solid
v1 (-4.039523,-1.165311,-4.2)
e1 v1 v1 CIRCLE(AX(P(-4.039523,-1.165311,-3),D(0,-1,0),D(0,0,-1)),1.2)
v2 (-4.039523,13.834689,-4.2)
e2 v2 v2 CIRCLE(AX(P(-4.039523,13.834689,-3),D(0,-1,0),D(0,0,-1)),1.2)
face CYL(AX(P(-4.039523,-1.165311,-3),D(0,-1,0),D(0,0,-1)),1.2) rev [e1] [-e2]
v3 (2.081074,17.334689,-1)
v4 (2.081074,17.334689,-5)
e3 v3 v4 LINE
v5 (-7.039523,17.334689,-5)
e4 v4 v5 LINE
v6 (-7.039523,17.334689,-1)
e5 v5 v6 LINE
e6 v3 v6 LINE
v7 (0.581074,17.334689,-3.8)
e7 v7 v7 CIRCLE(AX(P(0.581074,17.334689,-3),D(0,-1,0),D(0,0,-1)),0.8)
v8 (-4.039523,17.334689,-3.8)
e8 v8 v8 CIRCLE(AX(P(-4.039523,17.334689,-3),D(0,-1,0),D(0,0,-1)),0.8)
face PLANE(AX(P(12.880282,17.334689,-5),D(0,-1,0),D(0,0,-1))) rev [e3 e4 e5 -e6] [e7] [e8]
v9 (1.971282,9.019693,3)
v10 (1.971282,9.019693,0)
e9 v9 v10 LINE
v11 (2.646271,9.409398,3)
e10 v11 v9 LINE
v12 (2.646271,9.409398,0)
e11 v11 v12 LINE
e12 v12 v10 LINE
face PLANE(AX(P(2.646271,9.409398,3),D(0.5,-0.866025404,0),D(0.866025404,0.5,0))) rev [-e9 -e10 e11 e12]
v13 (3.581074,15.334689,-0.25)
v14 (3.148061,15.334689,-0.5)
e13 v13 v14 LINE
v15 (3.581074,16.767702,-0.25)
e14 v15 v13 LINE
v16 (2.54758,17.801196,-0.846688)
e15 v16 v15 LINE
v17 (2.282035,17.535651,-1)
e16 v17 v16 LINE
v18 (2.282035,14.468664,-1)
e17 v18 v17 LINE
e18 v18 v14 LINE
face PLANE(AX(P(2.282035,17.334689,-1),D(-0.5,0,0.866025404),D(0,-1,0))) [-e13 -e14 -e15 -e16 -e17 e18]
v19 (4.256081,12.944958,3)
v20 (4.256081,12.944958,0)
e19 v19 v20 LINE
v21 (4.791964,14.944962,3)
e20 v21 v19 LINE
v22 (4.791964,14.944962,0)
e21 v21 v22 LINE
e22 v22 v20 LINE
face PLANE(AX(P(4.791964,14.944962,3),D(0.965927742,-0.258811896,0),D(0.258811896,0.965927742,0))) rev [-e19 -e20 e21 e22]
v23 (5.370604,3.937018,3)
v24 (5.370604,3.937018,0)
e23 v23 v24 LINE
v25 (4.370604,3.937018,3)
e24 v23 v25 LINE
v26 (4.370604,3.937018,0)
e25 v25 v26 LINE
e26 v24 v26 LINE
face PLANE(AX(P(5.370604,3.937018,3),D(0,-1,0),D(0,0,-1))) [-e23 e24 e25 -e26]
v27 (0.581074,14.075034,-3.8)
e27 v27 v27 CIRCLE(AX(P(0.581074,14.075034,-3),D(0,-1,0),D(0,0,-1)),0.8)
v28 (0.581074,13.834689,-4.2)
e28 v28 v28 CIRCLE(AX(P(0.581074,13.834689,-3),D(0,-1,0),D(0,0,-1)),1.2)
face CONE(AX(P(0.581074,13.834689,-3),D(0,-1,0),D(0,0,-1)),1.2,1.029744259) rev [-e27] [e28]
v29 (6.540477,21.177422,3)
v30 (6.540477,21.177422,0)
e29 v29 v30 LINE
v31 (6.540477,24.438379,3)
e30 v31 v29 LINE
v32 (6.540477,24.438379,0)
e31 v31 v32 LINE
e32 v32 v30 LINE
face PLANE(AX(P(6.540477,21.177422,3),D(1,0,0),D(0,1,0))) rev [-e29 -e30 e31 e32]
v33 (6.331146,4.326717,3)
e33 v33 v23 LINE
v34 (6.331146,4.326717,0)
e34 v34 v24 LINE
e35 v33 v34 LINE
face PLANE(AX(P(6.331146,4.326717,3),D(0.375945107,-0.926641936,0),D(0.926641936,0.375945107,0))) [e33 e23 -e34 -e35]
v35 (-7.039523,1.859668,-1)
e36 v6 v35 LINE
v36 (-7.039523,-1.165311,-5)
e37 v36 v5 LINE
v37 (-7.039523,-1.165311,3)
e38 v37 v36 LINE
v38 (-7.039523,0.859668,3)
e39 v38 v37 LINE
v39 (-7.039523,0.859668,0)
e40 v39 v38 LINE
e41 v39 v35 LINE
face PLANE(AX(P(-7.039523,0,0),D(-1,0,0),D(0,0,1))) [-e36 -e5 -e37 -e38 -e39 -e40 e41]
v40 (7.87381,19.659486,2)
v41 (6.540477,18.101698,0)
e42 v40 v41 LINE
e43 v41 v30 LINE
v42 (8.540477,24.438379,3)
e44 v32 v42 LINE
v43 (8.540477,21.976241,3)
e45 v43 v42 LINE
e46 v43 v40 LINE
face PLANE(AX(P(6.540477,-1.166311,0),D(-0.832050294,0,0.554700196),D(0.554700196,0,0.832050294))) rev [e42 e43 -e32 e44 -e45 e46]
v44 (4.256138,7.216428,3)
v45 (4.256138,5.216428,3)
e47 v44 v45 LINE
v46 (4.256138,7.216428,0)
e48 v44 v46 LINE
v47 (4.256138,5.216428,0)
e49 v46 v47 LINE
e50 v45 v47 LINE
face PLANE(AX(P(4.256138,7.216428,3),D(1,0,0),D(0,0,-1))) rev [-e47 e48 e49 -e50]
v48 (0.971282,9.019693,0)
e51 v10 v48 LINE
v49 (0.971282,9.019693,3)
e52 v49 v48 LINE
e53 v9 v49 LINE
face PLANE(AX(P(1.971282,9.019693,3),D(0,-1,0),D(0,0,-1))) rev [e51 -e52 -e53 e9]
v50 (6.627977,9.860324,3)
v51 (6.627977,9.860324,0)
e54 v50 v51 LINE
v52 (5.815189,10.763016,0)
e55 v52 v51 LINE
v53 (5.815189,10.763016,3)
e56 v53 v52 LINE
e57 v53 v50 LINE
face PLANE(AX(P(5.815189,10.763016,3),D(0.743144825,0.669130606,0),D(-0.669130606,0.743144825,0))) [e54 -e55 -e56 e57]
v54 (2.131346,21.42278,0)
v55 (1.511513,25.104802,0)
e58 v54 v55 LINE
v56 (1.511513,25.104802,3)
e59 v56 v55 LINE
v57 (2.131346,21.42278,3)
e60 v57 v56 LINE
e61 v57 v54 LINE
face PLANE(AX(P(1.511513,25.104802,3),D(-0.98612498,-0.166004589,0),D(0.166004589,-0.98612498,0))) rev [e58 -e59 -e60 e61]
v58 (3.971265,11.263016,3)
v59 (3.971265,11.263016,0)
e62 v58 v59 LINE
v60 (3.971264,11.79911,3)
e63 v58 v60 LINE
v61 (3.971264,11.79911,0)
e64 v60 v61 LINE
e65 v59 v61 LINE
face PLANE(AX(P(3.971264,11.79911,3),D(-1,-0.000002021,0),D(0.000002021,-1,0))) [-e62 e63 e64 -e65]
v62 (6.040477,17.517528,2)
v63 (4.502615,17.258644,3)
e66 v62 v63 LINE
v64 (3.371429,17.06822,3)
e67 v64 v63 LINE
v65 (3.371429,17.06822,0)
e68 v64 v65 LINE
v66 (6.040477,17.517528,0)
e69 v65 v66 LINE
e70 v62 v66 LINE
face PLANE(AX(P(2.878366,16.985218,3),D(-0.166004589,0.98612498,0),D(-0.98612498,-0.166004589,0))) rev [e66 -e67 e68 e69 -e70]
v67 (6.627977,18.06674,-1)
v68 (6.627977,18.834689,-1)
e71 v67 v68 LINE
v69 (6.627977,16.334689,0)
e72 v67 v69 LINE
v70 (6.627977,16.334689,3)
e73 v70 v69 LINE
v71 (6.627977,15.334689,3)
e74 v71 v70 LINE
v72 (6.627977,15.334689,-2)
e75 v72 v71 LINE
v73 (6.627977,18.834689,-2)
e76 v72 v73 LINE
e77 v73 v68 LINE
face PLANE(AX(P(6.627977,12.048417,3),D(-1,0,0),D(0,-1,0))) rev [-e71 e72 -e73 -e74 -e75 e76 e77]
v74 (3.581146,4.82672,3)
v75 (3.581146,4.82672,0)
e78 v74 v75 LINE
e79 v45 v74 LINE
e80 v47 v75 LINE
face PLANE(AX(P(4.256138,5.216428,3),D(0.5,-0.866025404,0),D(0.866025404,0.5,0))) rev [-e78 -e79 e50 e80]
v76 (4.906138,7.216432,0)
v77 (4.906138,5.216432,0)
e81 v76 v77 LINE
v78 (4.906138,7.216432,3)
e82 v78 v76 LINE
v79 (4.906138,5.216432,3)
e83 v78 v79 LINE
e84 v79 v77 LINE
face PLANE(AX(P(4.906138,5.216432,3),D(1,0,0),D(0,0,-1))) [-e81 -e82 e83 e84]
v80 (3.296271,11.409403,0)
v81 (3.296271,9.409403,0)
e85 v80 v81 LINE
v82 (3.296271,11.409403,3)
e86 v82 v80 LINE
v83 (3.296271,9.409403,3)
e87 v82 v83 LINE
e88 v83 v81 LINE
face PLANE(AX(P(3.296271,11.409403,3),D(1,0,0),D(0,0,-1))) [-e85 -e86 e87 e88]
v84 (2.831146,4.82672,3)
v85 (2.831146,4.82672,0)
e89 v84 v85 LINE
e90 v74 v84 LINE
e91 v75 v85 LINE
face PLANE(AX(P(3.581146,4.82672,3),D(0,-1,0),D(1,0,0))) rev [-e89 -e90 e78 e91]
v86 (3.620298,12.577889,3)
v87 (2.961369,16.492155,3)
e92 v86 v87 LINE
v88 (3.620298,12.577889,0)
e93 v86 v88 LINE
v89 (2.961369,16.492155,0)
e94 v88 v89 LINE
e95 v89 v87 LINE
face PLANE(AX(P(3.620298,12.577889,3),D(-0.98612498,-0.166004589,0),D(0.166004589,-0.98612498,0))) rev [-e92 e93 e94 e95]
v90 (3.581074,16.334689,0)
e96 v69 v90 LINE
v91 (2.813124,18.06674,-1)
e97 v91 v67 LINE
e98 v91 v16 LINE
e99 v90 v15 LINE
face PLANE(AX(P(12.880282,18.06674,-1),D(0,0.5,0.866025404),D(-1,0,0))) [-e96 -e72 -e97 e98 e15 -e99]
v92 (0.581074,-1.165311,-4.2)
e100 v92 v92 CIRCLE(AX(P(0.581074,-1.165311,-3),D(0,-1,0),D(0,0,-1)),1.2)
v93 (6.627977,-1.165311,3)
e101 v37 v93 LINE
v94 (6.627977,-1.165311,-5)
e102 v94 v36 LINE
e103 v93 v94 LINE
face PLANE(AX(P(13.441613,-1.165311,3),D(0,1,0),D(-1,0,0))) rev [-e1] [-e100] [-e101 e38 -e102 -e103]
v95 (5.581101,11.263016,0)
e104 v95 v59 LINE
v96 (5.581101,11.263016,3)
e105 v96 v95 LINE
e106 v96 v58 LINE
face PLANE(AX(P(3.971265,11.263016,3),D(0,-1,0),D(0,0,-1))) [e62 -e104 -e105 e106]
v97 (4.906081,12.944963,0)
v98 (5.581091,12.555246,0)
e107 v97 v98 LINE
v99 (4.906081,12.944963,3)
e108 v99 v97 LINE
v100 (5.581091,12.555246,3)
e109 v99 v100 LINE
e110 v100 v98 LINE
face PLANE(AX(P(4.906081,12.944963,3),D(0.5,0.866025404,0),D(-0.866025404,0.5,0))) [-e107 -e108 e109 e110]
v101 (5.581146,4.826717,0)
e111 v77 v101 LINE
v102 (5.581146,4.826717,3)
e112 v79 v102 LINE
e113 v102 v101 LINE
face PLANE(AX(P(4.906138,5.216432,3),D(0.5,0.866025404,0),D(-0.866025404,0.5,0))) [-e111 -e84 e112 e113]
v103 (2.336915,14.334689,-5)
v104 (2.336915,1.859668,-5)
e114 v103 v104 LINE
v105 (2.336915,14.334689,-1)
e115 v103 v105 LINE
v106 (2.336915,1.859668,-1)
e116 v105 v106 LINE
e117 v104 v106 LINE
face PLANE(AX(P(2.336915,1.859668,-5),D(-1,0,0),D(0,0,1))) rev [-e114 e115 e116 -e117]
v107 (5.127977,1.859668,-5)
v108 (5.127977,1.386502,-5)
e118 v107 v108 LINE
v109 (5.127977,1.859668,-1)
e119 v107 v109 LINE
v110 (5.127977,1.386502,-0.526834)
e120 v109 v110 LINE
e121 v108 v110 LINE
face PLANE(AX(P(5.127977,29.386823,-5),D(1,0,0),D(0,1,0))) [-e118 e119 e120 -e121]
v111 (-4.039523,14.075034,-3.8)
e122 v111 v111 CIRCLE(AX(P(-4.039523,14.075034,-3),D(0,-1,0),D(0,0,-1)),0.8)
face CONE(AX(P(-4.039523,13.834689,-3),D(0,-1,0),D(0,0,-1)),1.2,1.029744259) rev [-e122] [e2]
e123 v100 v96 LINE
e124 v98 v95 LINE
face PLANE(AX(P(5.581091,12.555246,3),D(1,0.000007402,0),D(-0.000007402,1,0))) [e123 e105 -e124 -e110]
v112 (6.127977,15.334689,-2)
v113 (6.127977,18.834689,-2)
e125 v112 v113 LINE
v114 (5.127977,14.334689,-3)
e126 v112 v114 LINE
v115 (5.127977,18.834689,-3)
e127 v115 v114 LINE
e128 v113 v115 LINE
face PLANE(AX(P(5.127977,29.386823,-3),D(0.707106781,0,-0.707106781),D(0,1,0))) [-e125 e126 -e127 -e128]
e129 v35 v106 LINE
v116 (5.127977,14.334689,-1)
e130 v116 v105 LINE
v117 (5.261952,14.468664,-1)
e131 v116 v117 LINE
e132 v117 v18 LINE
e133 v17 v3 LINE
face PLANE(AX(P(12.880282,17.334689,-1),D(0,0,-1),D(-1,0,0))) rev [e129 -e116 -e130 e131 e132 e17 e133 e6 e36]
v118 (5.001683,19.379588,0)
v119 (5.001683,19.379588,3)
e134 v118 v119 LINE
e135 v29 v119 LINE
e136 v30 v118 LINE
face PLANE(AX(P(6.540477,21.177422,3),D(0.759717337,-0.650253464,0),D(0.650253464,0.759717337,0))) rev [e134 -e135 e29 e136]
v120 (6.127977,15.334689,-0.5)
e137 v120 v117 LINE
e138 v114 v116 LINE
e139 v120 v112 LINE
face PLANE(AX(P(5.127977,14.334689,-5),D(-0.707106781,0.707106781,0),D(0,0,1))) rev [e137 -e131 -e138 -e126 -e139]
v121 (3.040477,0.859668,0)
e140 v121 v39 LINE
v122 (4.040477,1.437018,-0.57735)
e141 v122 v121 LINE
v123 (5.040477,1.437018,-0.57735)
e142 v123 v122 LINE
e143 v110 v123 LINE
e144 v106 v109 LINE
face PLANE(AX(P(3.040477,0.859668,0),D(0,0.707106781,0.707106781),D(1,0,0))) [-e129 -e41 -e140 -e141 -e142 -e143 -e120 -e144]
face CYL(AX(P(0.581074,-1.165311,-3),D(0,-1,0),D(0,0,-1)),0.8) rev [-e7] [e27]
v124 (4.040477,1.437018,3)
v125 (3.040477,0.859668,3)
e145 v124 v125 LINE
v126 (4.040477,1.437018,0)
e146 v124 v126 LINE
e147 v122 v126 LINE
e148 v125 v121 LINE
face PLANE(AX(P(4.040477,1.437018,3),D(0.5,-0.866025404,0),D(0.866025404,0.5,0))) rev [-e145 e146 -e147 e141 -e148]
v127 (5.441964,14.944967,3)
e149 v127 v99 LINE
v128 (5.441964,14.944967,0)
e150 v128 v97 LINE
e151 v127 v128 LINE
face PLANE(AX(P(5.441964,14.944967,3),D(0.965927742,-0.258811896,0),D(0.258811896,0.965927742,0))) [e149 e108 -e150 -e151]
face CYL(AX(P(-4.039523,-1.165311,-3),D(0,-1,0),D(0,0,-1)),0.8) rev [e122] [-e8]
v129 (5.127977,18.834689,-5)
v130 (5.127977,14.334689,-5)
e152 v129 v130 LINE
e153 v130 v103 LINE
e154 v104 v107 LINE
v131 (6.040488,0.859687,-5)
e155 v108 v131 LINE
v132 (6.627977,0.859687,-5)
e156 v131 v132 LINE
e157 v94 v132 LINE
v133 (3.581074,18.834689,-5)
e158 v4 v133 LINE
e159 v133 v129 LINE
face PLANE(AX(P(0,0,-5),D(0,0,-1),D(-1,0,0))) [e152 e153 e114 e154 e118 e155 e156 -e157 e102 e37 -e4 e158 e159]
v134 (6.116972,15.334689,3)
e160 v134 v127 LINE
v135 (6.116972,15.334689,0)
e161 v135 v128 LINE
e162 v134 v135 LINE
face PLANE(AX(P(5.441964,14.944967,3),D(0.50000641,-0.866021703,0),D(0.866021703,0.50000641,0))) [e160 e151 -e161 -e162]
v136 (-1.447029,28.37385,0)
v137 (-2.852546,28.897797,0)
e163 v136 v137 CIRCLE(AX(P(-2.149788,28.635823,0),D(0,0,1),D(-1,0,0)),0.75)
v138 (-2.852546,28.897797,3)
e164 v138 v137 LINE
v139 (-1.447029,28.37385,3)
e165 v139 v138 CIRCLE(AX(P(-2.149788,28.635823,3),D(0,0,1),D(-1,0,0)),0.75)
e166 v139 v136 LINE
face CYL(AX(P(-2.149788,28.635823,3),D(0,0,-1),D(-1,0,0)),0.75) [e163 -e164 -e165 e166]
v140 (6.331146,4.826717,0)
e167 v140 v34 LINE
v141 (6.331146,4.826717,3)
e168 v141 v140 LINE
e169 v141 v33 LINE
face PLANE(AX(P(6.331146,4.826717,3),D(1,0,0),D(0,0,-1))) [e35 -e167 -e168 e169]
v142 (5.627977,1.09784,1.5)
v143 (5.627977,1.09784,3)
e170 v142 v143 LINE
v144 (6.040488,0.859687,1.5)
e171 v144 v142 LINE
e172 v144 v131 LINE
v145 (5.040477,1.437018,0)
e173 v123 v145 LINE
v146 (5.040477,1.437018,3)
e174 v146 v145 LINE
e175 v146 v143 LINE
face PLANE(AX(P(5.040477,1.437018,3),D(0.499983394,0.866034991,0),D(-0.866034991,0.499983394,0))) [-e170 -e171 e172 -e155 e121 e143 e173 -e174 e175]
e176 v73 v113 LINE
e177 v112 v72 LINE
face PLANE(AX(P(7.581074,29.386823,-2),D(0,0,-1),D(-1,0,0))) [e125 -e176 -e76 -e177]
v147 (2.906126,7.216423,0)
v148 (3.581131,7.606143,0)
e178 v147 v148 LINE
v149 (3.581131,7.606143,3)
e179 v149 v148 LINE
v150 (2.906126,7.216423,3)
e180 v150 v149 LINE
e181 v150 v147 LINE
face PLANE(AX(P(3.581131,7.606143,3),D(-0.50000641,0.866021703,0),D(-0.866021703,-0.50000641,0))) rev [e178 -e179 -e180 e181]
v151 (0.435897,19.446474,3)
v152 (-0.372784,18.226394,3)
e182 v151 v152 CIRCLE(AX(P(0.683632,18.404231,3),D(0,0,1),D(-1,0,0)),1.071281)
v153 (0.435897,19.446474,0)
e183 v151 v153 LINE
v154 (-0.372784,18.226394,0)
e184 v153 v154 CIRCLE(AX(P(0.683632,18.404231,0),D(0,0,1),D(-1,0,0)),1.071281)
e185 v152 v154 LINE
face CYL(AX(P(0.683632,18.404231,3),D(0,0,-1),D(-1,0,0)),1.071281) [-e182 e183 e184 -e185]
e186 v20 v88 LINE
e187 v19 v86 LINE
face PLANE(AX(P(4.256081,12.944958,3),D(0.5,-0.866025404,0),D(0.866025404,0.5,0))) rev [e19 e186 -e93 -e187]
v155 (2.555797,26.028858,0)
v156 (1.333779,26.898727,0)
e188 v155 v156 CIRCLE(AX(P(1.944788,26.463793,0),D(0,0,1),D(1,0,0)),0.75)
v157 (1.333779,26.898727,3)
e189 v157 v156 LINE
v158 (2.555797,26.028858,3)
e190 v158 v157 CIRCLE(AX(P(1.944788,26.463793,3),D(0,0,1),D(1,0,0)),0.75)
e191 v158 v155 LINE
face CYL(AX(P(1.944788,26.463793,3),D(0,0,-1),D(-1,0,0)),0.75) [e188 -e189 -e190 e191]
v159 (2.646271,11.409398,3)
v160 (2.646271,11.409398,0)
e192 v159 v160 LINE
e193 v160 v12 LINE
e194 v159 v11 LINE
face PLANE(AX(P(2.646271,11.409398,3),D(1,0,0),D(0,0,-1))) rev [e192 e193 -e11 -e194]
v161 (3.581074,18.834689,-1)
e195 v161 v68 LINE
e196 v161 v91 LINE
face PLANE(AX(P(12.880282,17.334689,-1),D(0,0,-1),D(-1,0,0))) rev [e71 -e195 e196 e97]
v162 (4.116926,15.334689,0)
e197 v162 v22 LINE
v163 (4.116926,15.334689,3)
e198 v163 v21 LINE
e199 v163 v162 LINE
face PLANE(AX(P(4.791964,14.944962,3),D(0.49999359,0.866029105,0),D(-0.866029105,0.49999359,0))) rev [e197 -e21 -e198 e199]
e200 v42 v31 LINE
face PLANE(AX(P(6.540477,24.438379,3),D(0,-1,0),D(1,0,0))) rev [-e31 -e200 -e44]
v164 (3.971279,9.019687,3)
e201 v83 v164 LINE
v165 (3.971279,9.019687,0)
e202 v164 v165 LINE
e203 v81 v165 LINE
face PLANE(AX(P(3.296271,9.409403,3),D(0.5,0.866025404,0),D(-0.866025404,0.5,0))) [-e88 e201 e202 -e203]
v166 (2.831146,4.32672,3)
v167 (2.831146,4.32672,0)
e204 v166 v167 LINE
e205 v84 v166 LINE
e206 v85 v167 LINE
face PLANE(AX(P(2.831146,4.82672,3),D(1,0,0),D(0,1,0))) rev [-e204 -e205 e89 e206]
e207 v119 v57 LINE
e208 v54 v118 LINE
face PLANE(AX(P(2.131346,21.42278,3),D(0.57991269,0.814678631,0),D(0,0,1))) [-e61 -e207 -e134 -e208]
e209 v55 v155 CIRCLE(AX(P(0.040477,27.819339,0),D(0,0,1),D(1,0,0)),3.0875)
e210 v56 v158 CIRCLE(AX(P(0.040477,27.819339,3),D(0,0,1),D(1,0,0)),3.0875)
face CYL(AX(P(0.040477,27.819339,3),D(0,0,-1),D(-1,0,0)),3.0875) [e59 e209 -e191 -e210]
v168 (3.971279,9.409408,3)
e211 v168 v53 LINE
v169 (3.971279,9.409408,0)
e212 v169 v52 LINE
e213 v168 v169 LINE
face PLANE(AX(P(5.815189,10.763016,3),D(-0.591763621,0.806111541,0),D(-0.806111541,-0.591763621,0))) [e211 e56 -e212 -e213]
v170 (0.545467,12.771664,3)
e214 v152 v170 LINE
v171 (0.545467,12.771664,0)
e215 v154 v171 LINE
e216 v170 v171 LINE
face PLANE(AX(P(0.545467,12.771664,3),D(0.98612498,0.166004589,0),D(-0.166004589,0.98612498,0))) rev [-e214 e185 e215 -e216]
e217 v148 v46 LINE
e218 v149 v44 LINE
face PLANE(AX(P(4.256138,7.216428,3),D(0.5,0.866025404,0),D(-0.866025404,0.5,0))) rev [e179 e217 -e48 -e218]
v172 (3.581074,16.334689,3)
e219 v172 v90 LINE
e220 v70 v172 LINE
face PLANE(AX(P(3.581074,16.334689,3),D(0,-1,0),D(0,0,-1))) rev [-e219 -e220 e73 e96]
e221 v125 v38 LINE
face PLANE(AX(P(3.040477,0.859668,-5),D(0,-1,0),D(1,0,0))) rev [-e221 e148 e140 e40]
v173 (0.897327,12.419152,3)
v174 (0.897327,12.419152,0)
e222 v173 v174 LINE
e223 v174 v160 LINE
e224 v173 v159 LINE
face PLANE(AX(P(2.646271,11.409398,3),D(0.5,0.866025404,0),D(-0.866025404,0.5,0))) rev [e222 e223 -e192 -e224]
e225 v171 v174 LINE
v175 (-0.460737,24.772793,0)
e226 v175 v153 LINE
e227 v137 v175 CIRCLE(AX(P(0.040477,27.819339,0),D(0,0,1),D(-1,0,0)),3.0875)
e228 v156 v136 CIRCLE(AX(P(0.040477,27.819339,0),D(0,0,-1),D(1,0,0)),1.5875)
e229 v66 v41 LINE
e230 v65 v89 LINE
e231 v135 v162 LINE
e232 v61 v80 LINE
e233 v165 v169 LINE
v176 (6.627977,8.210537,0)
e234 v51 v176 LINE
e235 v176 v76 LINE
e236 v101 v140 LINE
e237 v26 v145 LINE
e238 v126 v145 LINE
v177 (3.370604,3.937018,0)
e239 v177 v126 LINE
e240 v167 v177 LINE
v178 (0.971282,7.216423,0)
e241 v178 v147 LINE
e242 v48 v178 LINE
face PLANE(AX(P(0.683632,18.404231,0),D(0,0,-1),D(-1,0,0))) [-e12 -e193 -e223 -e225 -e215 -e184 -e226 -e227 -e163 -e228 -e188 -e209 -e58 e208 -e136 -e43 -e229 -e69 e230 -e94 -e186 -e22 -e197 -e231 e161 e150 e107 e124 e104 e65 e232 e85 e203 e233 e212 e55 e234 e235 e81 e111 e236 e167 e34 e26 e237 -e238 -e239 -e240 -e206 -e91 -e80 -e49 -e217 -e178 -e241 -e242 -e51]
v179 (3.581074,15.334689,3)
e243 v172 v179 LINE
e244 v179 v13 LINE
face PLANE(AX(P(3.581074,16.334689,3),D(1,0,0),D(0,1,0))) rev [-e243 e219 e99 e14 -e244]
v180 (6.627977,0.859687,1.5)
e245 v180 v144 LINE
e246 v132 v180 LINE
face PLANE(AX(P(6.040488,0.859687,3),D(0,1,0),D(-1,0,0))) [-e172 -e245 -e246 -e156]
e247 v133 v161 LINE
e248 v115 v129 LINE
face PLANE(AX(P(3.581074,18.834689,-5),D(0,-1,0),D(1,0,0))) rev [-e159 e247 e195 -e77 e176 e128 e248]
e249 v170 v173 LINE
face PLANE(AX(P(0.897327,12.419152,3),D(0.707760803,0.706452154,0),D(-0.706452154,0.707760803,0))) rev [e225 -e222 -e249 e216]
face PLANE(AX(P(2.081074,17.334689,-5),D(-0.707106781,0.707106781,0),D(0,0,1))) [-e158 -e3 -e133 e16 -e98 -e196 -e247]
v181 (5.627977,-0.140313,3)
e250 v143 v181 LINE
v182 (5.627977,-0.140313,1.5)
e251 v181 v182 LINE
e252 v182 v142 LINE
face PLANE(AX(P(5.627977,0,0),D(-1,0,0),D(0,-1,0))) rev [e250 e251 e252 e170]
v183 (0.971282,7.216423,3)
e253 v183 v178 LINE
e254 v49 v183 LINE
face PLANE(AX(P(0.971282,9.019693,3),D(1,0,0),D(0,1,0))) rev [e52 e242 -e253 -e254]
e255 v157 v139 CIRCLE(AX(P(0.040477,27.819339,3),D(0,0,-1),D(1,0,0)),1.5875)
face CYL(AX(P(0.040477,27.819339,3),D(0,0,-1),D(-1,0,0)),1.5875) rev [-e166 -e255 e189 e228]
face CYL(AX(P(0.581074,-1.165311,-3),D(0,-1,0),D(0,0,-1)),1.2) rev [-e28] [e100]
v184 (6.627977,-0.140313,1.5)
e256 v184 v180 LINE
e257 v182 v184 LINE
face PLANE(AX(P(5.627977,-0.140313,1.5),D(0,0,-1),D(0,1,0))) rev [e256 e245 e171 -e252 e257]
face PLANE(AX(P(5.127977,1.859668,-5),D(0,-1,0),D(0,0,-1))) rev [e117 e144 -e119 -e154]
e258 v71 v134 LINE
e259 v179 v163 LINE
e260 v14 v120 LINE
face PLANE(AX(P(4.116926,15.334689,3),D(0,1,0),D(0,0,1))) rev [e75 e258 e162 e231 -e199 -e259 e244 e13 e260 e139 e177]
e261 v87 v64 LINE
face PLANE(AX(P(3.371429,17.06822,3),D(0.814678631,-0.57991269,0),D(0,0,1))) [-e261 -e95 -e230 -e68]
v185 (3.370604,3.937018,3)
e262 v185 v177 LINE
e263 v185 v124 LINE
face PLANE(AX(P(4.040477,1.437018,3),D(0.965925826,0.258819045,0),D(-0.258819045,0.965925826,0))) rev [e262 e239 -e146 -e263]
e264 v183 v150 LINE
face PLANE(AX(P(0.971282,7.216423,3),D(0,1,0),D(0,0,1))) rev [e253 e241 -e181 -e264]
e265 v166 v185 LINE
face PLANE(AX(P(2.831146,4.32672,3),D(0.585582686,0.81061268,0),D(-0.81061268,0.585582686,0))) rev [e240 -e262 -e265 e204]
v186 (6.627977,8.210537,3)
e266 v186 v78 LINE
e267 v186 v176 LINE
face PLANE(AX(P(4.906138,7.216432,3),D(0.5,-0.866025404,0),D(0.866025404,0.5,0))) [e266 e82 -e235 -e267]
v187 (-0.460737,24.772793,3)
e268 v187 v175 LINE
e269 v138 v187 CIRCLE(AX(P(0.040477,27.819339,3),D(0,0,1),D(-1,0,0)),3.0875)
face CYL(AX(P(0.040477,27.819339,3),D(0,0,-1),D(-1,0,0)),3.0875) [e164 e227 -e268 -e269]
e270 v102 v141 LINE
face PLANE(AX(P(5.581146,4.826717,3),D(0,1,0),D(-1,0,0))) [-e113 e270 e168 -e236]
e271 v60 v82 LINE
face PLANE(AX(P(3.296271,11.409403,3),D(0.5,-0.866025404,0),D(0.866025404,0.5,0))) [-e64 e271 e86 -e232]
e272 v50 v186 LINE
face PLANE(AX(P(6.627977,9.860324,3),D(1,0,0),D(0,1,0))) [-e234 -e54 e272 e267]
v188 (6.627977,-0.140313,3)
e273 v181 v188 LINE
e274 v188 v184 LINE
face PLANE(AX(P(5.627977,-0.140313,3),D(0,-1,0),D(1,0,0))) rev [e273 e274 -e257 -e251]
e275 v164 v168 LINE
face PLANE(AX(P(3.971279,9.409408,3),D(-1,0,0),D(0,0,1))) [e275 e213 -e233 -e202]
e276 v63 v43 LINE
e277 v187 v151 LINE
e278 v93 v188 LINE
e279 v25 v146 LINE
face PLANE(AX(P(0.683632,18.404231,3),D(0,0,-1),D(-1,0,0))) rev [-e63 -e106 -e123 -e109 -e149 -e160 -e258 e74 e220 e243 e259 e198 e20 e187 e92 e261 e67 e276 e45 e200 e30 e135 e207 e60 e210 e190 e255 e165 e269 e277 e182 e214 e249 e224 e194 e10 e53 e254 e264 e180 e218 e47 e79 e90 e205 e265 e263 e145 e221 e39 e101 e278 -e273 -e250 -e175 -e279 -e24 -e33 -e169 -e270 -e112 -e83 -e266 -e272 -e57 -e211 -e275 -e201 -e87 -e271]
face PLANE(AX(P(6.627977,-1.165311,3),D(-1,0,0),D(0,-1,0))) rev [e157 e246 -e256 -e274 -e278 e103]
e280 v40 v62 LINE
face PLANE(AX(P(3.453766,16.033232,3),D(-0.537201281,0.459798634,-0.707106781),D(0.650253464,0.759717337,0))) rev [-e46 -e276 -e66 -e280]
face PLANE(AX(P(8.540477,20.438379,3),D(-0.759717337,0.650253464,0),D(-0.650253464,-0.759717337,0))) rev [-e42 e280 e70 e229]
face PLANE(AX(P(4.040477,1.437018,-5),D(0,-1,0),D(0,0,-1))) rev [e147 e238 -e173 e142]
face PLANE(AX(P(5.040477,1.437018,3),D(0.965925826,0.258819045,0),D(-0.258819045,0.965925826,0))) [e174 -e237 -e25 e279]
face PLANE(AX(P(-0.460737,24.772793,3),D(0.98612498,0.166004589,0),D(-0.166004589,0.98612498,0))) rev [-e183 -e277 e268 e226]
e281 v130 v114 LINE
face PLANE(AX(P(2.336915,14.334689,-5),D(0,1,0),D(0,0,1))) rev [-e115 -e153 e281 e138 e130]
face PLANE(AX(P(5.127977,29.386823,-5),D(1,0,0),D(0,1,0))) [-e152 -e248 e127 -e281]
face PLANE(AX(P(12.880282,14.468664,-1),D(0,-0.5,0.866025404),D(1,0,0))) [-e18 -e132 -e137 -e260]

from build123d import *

# Parameters (mm, degrees)
BOSS_SWITCH_BODY_DEPTH                         = 3
SKETCH1_W                                      = 4
SKETCH1_H                                      = 3.5
BOSS_FLANGE_WIDTH_DEPTH                        = 5
BOSS_FLANGE_HEIGHT_REACH                       = 38.166
SKETCH2_W                                      = 4
SKETCH2_H                                      = 2
SKETCH2_W_2                                    = 8
SKETCH2_H_2                                    = 2.024978658
CUT_UP_TO_DOWN_DERAILLEUR_CLEARANCE_REACH      = 23.862
SKETCH10_W                                     = 2.453096586
SKETCH10_H                                     = 3
SKETCH17_W                                     = 12.1675
SKETCH17_H                                     = 4
BOSS_FLANGE_SUPPORT_DEPTH                      = 14.475021342
TAP_DRILL_FOR_M2X0_4_TAP1_D                    = 1.6
M2_CLEARANCE_HOLE2_D                           = 2.4
M2_CLEARANCE_HOLE2_DEPTH                       = 15
M2_CLEARANCE_HOLE2_TIP                         = 0.721032743
CUT_UP_TO_DOWN_CANTILEVER_SLOPE_REACH          = 31.347
CUT_DOWN_TO_UP_DERAILLEUR_CLEARANCE_DEPTH      = 33.698678667
CUT_DOWN_TO_UP_DERAILLEUR_CLEARANCE_DEPTH_BACK = 33.698678667
CHAMFER_FLANGE_SUPPORT_SIZE                    = 1.5
CHAMFER_FLANGE_SUPPORT_2_SIZE                  = 1
CHAMFER_FLANGE_SUPPORT_3_SIZE                  = 1
SKETCH18_W                                     = 1.5
SKETCH18_H                                     = 1.577331094
CUT_DOWN_TO_UP_DERAILLEUR_CLEARANCE_2_DEPTH    = 1
SKETCH19_W                                     = 3.046903414
SKETCH19_H                                     = 2.563581512
CUT_UP_TO_DOWN_CANTILEVER_CLEARANCE_DEPTH      = 1
CHAMFER1_SIZE                                  = 1
CHAMFER1_SIZE_2                                = 1.732050808
CHAMFER3_SIZE                                  = 0.75
CHAMFER3_SIZE_2                                = 1.299038106
CHAMFER4_SIZE                                  = 0.5
CHAMFER4_SIZE2                                 = 0.866025404
CHAMFER5_SIZE                                  = 0.5
CHAMFER6_SIZE                                  = 2.5
CHAMFER7_SIZE                                  = 1
CUT_EXTRUDE3_REACH                             = 33.008
SKETCH23_W                                     = 2.791062273
SKETCH23_H                                     = 12.475021342
CUT_GAP_FOR_PRINTING_DEPTH                     = 31.862053717


# Some blends are built 0.0001 mm under size
with BuildPart() as part:
    # Sketch-SwitchBossUp → Boss-Switch Body (new body)
    with BuildSketch(Plane.XY):
        with BuildLine():
            Line((6.540476927, 21.177422148), (6.540476927, 24.438379064))
            Line((6.540476927, 24.438379064), (8.540476927, 24.438379064))
            Line((8.540476927, 24.438379064), (8.540476927, 20.438379064))
            Line((8.540476927, 20.438379064), (6.040476927, 17.517528279))
            Line((6.040476927, 17.517528279), (2.878366495, 16.985217616))
            Line((2.878366495, 16.985217616), (3.620297651, 12.577888564))
            Line((3.620297651, 12.577888564), (4.256080915, 12.944958203))
            Line((4.256080915, 12.944958203), (4.791964496, 14.944962169))
            Line((4.791964496, 14.944962169), (4.116925685, 15.334689347))
            Line((4.116925685, 15.334689347), (3.581073513, 15.334689347))
            Line((3.581073513, 15.334689347), (3.581073513, 16.334689347))
            Line((3.581073513, 16.334689347), (6.857327822, 16.334689347))
            Line((6.857327822, 16.334689347), (13.441613484, 16.334689347))
            Line((13.441613484, 16.334689347), (13.441613484, -1.165310653))
            Line((13.441613484, -1.165310653), (5.040476927, -1.165310653))
            Line((5.040476927, -1.165310653), (3.040476927, -1.165310653))
            Line((3.040476927, -1.165310653), (3.040476927, 0.859668005))
            Line((3.040476927, 0.859668005), (4.040476927, 1.437018274))
            Line((4.040476927, 1.437018274), (3.370603946, 3.937018274))
            Line((3.370603946, 3.937018274), (2.83114552, 4.326720436))
            Line((2.83114552, 4.326720436), (2.83114552, 4.826720436))
            Line((2.83114552, 4.826720436), (3.58114552, 4.826720436))
            Line((3.58114552, 4.826720436), (4.256138119, 5.216427595))
            Line((4.256138119, 5.216427595), (4.256138119, 7.216427595))
            Line((4.256138119, 7.216427595), (3.581130717, 7.6061433))
            Line((3.581130717, 7.6061433), (2.9061262, 7.216422599))
            Line((2.9061262, 7.216422599), (0.971281627, 7.216422599))
            Line((0.971281627, 7.216422599), (0.971281627, 9.019692757))
            Line((0.971281627, 9.019692757), (1.971281627, 9.019692757))
            Line((1.971281627, 9.019692757), (2.646271341, 9.40939825))
            Line((2.646271341, 9.40939825), (2.646271341, 11.40939825))
            Line((2.646271341, 11.40939825), (0.897326855, 12.41915182))
            Line((0.897326855, 12.41915182), (0.545466745, 12.771663724))
            Line((0.545466745, 12.771663724), (-0.372784255, 18.226393961))
            ThreePointArc((-0.372784255, 18.226393961), (-0.209313172, 18.996084896), (0.435897335, 19.446473985))
            Line((0.435897335, 19.446473985), (-0.46073685, 24.772792819))
            ThreePointArc((-0.46073685, 24.772792819), (-2.630501593, 26.270619745), (-2.852546321, 28.897797067))
            ThreePointArc((-2.852546321, 28.897797067), (-1.887813913, 29.338582026), (-1.447028953, 28.373849618))
            ThreePointArc((-1.447028953, 28.373849618), (-0.703448682, 26.416936722), (1.333779254, 26.898727173))
            ThreePointArc((1.333779254, 26.898727173), (2.379722745, 27.074801628), (2.555797201, 26.028858137))
            ThreePointArc((2.555797201, 26.028858137), (2.086504637, 25.507104397), (1.511513111, 25.104801997))
            Line((1.511513111, 25.104801997), (2.546357317, 18.957467576))
            Line((2.546357317, 18.957467576), (4.992893704, 19.36931828))
            Line((4.992893704, 19.36931828), (6.540476927, 21.177422148))
        make_face()
        Polygon((5.581091201, 12.555245643), (5.581100766, 11.263016278), (3.971265023, 11.263016278), (3.97126394, 11.79911022), (3.296271341, 11.409403061), (3.296271341, 9.409403061), (3.971278743, 9.019687356), (3.971278743, 9.409408058), (5.815189335, 10.763016278), (6.627976927, 9.860324206), (6.627976927, 8.210536506), (5.581127833, 7.606137899), (4.906138119, 7.216432406), (4.906138119, 5.216432406), (5.58114552, 4.826716701), (6.33114552, 4.826716701), (6.33114552, 4.326716701), (5.370603946, 3.937018274), (4.370603946, 3.937018274), (5.040476927, 1.437018274), (6.040487998, 0.85968718), (9.127976927, 0.85968718), (10.437466736, 2.169176988), (10.437466736, 14.025199539), (9.127976927, 15.334689347), (6.116971898, 15.334689347), (5.441964496, 14.94496698), (4.906080915, 12.944963014), align=None, mode=Mode.SUBTRACT)
    extrude(amount=BOSS_SWITCH_BODY_DEPTH)

    # Sketch1 → Boss-Flange Width (add)
    with BuildSketch(Plane(origin=(0, 0, 0), x_dir=(-1, 0, 0), z_dir=(0, 0, -1))):
        Polygon((-7.581073513, -1.165310653), (0.412170615, -1.165310653), (0.412170615, 0.859668005), (-3.040476927, 0.859668005), (-4.040476927, 1.437018274), (-5.040476927, 1.437018274), (-6.040487998, 0.85968718), (-7.581073513, 0.85968718), align=None)
        with Locations((-5.581073513, 17.084689347)):
            Rectangle(SKETCH1_W, SKETCH1_H)
    extrude(amount=BOSS_FLANGE_WIDTH_DEPTH)

    # Sketch2 → Boss-Flange Height (add, up to next)
    with BuildSketch(Plane(origin=(-7.039523073, 0, 0), x_dir=(0, 0, -1), z_dir=(1, 0, 0)), mode=Mode.PRIVATE) as boss_flange_height_sk1:
        with Locations((3, 16.334689347)):
            Rectangle(SKETCH2_W, SKETCH2_H)
    boss_flange_height_tool1 = extrude(boss_flange_height_sk1.sketch, amount=BOSS_FLANGE_HEIGHT_REACH, mode=Mode.PRIVATE) - part.part
    # Sketch2 → Boss-Flange Height (add, up to next)
    with BuildSketch(Plane(origin=(-7.039523073, 0, 0), x_dir=(0, 0, -1), z_dir=(1, 0, 0)), mode=Mode.PRIVATE) as boss_flange_height_sk2:
        with Locations((1, -0.152821324)):
            Rectangle(SKETCH2_W_2, SKETCH2_H_2)
    boss_flange_height_tool2 = extrude(boss_flange_height_sk2.sketch, amount=BOSS_FLANGE_HEIGHT_REACH, mode=Mode.PRIVATE) - part.part
    add(boss_flange_height_tool1.solids().sort_by_distance((-7.039523, 16.334689, -3))[0])
    add(boss_flange_height_tool2.solids().sort_by_distance((-7.039523, -0.152821, -1))[0])

    # Sketch10 → Cut-Up-To-Down Derailleur Clearance (cut, up to next)
    with BuildSketch(Plane(origin=(0, 15.334689347, 0), x_dir=(1, 0, 0), z_dir=(0, 1, 0)), mode=Mode.PRIVATE) as cut_up_to_down_derailleur_clearance_sk1:
        with Locations((6.35452522, 3.5)):
            Rectangle(SKETCH10_W, SKETCH10_H)
    cut_up_to_down_derailleur_clearance_tool1 = extrude(cut_up_to_down_derailleur_clearance_sk1.sketch, amount=CUT_UP_TO_DOWN_DERAILLEUR_CLEARANCE_REACH, mode=Mode.PRIVATE) & part.part
    add(cut_up_to_down_derailleur_clearance_tool1.solids().sort_by_distance((6.354525, 15.334689, -3.5))[0], mode=Mode.SUBTRACT)

    # Sketch17 → Boss-Flange Support (add)
    with BuildSketch(Plane.XZ.offset(-15.334689347)):
        with Locations((-0.955773073, -3)):
            Rectangle(SKETCH17_W, SKETCH17_H)
    extrude(amount=BOSS_FLANGE_SUPPORT_DEPTH)

    # Tap Drill for M2x0.4 Tap1 (through all)
    with Locations(Plane(origin=(0, -1.165310653, 0), x_dir=(-1, 0, 0), z_dir=(0, -1, 0))):
        with Locations((4.039523073, 3), (-0.581073513, 3)):
            Hole(TAP_DRILL_FOR_M2X0_4_TAP1_D / 2)

    # M2 Clearance Hole2
    with Locations(Plane.XZ.offset(1.165310653)):
        with Locations((-4.039523073, -3), (0.581073513, -3)):
            Hole(M2_CLEARANCE_HOLE2_D / 2, depth=M2_CLEARANCE_HOLE2_DEPTH)
            with Locations((0, 0, -(M2_CLEARANCE_HOLE2_DEPTH + M2_CLEARANCE_HOLE2_TIP / 2))):  # 118° drill point
                Cone(0, M2_CLEARANCE_HOLE2_D / 2, M2_CLEARANCE_HOLE2_TIP, mode=Mode.SUBTRACT)

    # Sketch12 → Cut-Up-to-Down Cantilever Slope (cut, up to next)
    with BuildSketch(Plane(origin=(0, 24.438379064, 0), x_dir=(1, 0, 0), z_dir=(0, 1, 0)), mode=Mode.PRIVATE) as cut_up_to_down_cantilever_slope_sk1:
        Polygon((6.540476927, 0), (8.540476927, -3), (8.540476927, 0), align=None)
    cut_up_to_down_cantilever_slope_tool1 = extrude(cut_up_to_down_cantilever_slope_sk1.sketch, amount=-CUT_UP_TO_DOWN_CANTILEVER_SLOPE_REACH, mode=Mode.PRIVATE) & part.part
    add(cut_up_to_down_cantilever_slope_tool1.solids().sort_by_distance((7.87381, 24.438379, 1))[0], mode=Mode.SUBTRACT)

    # Sketch16 → Cut-Down-to-Up Derailleur Clearance (cut, two sides: drawn at the far end of the back side and taken through both)
    with BuildSketch(Plane(origin=(0, 0, 0), x_dir=(-1, 0, 0), z_dir=(0, 0, -1)).offset(-CUT_DOWN_TO_UP_DERAILLEUR_CLEARANCE_DEPTH_BACK)):
        Polygon((-7.581073513, 18.834689347), (-13.441613484, 18.834689347), (-13.441613484, -1.165310653), (-6.627976927, -1.165310653), (-6.627976927, 5.203794929), (-8.003689255, 5.203794929), (-8.003689255, 12.048417413), (-6.627976927, 12.048417413), (-6.627976927, 17.947659965), align=None)
    extrude(amount=CUT_DOWN_TO_UP_DERAILLEUR_CLEARANCE_DEPTH + CUT_DOWN_TO_UP_DERAILLEUR_CLEARANCE_DEPTH_BACK, mode=Mode.SUBTRACT)

    # Chamfer-Flange Support
    chamfer_flange_support_edges = [part.edges().sort_by_distance(p)[0] for p in [
        (3.581073513, 17.334689347, -3),
    ]]
    chamfer(chamfer_flange_support_edges, length=CHAMFER_FLANGE_SUPPORT_SIZE - 0.0001)  # a hair under: the kernel refuses the full size

    # Chamfer-Flange Support 2
    chamfer_flange_support_2_edges = [part.edges().sort_by_distance(p)[0] for p in [
        (5.127976927, 17.084689347, -2),
        (5.127976927, 15.334689347, -1.5),
    ]]
    chamfer(chamfer_flange_support_2_edges, length=CHAMFER_FLANGE_SUPPORT_2_SIZE)

    # Chamfer-Flange Support 3
    chamfer_flange_support_3_edges = [part.edges().sort_by_distance(p)[0] for p in [
        (-1.999523073, 0.859668005, -1),
    ]]
    chamfer(chamfer_flange_support_3_edges, length=CHAMFER_FLANGE_SUPPORT_3_SIZE)

    # Sketch18 → Cut-Down-to-Up Derailleur Clearance 2 (cut)
    with BuildSketch(Plane(origin=(6.627976927, 0, 0), x_dir=(0, 0, -1), z_dir=(1, 0, 0))):
        with Locations((-2.25, 0.648352727)):
            Rectangle(SKETCH18_W, SKETCH18_H)
    extrude(amount=-CUT_DOWN_TO_UP_DERAILLEUR_CLEARANCE_2_DEPTH, mode=Mode.SUBTRACT)

    # Sketch19 → Cut-Up-to-Down Cantilever Clearance (cut)
    with BuildSketch(Plane.XY):
        with Locations((5.10452522, 17.616480103)):
            Rectangle(SKETCH19_W, SKETCH19_H)
    extrude(amount=-CUT_UP_TO_DOWN_CANTILEVER_CLEARANCE_DEPTH, mode=Mode.SUBTRACT)

    # Chamfer1
    # the kernel refuses this chamfer: 1.732050808, 1 mm, written as the material it adds along each edge
    with BuildSketch(Plane(origin=(6.627976927, 16.334689347, -1), x_dir=(0, -0.05789386240266977, 0.9983227437537926), z_dir=(-1, 0, 0))) as chamfer1_piece_1:
        Polygon((CHAMFER1_SIZE * 0.998322743754, CHAMFER1_SIZE * 0.0578938624027), (-CHAMFER1_SIZE_2 * 0.0578938623883, CHAMFER1_SIZE_2 * 0.998322743505), (0, 0), align=None)
    extrude(amount=3.046903414)

    # Chamfer3
    # the kernel refuses this chamfer: 1.299038106, 0.75 mm, written as the material it adds along each edge
    with BuildSketch(Plane(origin=(3.581073513, 15.334689347, -1), x_dir=(0.05789386240236086, -1.5934376059306423e-13, 0.9983227437538106), z_dir=(0, 1, 0))) as chamfer3_piece_1_section:
        Polygon((CHAMFER3_SIZE * 0.998322743754, -CHAMFER3_SIZE * 0.0578938624027), (-CHAMFER3_SIZE_2 * 0.057893862388, -CHAMFER3_SIZE_2 * 0.998322743505), (0, 0), align=None)
    chamfer3_piece_1 = extrude(amount=6.092773786, mode=Mode.PRIVATE)
    chamfer3_piece_1 = split(chamfer3_piece_1, bisect_by=Plane(origin=(3.127107762, 16.799062109, -0.268105739), z_dir=(0, -0.4999999999999566, -0.8660254037844637)), keep=Keep.TOP, mode=Mode.PRIVATE)
    chamfer3_piece_1 = split(chamfer3_piece_1, bisect_by=Plane(origin=(2.18713947, 17.440655304, -0.784906566), z_dir=(0.7071067811865476, -0.7071067811865476, 0)), keep=Keep.TOP, mode=Mode.PRIVATE)
    add(chamfer3_piece_1)

    # Chamfer4
    chamfer4_edges = [part.edges().sort_by_distance(p)[0] for p in [
        (4.205006167, 15.334689347, -1),
    ]]
    chamfer4_side = [part.faces().sort_by_distance(p)[0] for p in [
        (2.964678171, 15.334689347, -0.682371949),
    ]]
    chamfer(chamfer4_edges, length=CHAMFER4_SIZE, length2=CHAMFER4_SIZE2, reference=chamfer4_side[0])

    # Chamfer5
    chamfer5_edges = [part.edges().sort_by_distance(p)[0] for p in [
        (2.878366495, 16.985217616, 1.5),
    ]]
    chamfer(chamfer5_edges, length=CHAMFER5_SIZE)

    # Chamfer6
    # the kernel refuses this chamfer: 2.5 mm, written as the material it adds along each edge
    with BuildSketch(Plane(origin=(2.546357317, 18.957467576, 0), x_dir=(0.9903165846799726, 0.13882745444541758, 0), z_dir=(0, 0, 1))) as chamfer6_piece_1:
        Polygon((CHAMFER6_SIZE * 0.999621916911, CHAMFER6_SIZE * 0.0274958766106), (-CHAMFER6_SIZE * 0.0274958766106, CHAMFER6_SIZE * 0.999621916911), (0, 0), align=None)
    extrude(amount=3)

    # Chamfer7
    chamfer7_edges = [part.edges().sort_by_distance(p)[0] for p in [
        (7.290476927, 18.977953671, 3),
    ]]
    chamfer(chamfer7_edges, length=CHAMFER7_SIZE)

    # Sketch22 → Cut-Extrude3 (cut, up to next)
    with BuildSketch(Plane.XY, mode=Mode.PRIVATE) as cut_extrude3_sk1:
        Polygon((6.627976927, 17.947659965), (7.581073513, 18.834689347), (6.627976927, 18.834689347), align=None)
    cut_extrude3_tool1 = extrude(cut_extrude3_sk1.sketch, amount=-CUT_EXTRUDE3_REACH, mode=Mode.PRIVATE) & part.part
    add(cut_extrude3_tool1.solids().sort_by_distance((6.945676, 18.539013, 0))[0], mode=Mode.SUBTRACT)

    # Sketch23 → Cut-Gap for Printing (cut, through all)
    with BuildSketch(Plane.XY.offset(-1)):
        with Locations((3.732445791, 8.097178676)):
            Rectangle(SKETCH23_W, SKETCH23_H)
    extrude(amount=-CUT_GAP_FOR_PRINTING_DEPTH, mode=Mode.SUBTRACT)


solid = part.part
